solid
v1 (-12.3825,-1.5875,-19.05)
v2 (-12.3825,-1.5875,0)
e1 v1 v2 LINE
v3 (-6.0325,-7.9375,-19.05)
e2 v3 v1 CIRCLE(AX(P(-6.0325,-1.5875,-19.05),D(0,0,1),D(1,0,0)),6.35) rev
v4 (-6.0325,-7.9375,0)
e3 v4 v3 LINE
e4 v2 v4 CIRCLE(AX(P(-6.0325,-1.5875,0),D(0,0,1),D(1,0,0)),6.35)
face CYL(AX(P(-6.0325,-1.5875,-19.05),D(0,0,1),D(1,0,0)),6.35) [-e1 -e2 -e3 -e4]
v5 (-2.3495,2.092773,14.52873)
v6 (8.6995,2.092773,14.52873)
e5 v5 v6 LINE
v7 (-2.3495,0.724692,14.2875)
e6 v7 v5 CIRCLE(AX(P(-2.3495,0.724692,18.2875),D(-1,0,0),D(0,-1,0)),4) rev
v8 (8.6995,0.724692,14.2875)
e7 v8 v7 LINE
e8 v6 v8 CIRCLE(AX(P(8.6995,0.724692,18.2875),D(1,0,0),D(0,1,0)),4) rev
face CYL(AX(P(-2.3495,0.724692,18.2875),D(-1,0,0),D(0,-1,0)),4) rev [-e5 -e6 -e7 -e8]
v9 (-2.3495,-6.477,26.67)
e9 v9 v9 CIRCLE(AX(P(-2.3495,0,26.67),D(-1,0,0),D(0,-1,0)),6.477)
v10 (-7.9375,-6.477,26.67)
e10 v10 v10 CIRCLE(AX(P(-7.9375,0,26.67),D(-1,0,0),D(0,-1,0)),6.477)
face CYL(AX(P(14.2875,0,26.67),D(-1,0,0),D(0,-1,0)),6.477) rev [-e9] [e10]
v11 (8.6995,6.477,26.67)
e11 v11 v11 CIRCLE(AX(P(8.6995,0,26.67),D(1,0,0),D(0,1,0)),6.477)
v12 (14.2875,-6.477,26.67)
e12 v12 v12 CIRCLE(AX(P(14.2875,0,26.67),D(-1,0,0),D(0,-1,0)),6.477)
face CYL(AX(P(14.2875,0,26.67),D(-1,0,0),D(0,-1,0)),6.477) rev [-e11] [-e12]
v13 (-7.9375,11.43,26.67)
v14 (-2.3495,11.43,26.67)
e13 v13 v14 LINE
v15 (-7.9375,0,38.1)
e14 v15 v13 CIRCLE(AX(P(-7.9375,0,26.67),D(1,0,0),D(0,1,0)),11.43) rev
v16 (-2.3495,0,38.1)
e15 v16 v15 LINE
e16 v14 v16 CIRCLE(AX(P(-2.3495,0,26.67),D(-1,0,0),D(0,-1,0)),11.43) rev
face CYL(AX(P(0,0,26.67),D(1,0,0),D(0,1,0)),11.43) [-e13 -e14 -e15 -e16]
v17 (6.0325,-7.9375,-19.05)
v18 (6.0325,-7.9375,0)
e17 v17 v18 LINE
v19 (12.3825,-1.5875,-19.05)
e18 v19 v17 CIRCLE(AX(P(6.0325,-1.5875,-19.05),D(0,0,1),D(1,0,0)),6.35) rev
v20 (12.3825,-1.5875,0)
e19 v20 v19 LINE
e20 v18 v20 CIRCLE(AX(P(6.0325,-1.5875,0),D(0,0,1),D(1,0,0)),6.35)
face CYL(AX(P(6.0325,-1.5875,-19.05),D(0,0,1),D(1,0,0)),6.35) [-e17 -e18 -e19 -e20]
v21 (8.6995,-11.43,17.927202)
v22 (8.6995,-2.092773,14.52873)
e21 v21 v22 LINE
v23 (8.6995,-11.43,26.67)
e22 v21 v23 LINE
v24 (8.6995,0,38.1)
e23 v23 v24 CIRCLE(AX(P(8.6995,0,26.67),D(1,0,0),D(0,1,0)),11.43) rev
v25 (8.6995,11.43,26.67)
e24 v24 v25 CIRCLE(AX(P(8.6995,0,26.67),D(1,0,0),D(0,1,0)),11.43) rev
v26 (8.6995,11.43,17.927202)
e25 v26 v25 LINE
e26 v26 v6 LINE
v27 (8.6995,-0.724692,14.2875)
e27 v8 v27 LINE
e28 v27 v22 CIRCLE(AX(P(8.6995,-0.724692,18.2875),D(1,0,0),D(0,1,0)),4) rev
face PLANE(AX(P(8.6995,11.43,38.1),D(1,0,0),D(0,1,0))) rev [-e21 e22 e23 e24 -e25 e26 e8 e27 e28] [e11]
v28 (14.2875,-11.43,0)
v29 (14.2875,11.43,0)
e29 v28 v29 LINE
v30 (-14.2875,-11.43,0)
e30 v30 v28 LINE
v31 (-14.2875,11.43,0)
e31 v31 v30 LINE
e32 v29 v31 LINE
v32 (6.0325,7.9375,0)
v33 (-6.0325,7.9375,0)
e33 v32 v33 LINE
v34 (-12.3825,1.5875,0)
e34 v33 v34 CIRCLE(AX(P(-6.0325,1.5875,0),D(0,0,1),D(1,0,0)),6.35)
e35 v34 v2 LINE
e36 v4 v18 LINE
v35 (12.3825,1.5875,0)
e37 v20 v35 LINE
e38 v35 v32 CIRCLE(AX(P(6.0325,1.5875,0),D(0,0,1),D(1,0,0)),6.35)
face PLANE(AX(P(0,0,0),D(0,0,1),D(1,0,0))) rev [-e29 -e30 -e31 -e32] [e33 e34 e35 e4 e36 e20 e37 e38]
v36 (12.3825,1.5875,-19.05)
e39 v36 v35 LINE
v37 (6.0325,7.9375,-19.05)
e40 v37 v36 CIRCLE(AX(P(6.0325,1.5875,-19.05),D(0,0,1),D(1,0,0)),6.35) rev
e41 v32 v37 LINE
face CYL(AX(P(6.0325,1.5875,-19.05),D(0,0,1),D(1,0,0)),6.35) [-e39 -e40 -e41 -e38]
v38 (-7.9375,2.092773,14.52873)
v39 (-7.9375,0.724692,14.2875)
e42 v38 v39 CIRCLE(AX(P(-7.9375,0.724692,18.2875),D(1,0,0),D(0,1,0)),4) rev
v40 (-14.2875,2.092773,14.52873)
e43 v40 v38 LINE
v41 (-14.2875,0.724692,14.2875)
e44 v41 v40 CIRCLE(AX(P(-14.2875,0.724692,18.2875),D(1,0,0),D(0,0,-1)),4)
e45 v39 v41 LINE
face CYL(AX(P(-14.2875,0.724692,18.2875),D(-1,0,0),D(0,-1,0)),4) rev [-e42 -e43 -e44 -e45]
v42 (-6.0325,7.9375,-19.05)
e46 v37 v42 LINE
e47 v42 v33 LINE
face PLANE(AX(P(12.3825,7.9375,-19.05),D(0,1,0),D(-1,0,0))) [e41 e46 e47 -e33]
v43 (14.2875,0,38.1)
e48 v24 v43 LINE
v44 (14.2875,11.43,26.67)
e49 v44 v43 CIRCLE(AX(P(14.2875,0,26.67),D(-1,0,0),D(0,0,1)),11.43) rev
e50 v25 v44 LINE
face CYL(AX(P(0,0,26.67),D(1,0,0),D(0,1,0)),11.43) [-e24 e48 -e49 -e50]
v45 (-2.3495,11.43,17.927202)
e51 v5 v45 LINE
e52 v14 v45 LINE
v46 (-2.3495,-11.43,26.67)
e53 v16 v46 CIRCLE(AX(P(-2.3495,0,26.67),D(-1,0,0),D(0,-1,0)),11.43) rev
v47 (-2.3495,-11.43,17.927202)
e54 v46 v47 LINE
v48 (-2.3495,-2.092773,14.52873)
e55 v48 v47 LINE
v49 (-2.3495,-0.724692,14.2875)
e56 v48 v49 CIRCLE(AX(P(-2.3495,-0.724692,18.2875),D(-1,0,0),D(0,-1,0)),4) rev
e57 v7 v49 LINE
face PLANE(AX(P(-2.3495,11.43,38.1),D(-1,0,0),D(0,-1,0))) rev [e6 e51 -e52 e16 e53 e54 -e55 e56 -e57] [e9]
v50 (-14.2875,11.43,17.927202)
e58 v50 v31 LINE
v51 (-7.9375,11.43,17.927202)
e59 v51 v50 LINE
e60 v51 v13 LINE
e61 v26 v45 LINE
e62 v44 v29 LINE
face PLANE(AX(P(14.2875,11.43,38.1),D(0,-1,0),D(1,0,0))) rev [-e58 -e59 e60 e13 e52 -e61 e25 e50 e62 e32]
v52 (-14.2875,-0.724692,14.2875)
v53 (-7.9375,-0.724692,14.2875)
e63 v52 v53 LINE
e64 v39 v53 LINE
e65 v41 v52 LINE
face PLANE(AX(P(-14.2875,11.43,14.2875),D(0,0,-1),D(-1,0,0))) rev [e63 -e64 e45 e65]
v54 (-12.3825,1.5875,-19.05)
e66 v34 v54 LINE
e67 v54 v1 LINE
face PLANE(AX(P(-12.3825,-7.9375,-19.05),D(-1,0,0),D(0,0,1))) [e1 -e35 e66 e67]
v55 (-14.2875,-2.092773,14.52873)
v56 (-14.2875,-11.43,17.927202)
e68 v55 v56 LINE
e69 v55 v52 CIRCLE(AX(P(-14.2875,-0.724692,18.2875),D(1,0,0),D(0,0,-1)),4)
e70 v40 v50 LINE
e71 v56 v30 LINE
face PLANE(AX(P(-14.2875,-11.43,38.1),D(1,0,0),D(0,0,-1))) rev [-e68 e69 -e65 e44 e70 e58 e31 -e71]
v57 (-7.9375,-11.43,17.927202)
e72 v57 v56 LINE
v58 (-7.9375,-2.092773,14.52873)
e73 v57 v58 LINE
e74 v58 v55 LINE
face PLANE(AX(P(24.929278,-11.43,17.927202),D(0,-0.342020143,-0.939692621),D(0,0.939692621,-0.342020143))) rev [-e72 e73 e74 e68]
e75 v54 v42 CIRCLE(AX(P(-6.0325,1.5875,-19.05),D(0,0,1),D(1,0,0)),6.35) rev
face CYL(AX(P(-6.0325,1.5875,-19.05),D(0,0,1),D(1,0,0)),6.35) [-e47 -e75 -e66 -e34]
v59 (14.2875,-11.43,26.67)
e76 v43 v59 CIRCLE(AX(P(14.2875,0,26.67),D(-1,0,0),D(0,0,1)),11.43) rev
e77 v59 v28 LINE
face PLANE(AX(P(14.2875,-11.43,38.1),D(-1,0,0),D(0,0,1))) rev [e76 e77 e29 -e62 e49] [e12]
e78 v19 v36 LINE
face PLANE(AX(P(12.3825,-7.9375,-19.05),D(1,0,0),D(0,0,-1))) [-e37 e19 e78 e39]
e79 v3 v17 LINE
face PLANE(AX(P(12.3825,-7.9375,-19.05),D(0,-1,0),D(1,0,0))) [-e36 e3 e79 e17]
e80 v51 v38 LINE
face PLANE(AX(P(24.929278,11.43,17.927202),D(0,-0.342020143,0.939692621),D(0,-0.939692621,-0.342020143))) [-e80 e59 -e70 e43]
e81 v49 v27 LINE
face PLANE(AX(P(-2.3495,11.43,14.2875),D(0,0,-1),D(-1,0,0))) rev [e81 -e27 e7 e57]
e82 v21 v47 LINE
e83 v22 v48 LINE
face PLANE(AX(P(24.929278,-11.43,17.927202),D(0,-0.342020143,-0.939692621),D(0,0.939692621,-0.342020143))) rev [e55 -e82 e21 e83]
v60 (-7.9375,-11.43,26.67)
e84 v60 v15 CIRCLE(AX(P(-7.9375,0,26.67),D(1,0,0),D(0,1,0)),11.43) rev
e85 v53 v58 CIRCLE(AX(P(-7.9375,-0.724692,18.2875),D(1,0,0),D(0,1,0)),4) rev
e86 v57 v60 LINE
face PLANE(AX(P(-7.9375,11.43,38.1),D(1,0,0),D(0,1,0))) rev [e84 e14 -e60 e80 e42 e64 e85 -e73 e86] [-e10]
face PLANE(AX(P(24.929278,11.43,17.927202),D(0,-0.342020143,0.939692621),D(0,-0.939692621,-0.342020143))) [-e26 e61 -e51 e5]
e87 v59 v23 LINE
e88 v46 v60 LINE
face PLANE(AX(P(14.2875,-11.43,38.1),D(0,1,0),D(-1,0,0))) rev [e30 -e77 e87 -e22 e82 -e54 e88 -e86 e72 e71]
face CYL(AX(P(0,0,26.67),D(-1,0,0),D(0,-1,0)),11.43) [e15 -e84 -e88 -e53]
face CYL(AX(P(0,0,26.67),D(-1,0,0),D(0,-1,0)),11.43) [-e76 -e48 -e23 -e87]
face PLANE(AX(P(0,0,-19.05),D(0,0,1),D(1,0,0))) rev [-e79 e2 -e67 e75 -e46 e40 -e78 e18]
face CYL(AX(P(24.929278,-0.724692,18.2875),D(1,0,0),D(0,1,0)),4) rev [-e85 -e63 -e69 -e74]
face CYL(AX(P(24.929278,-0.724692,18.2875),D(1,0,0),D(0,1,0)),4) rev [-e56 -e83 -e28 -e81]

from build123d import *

# Parameters (mm, degrees)
SKETCH2_W           = 24.765
SKETCH2_H           = 15.875
BOSS_EXTRUDE1_DEPTH = 19.05
SKETCH3_W           = 28.575
SKETCH3_H           = 22.86
BOSS_EXTRUDE2_DEPTH = 38.1
SKETCH4_W           = 6.35
SKETCH4_H           = 23.8125
SKETCH4_W_2         = 11.049
CUT_EXTRUDE1_DEPTH  = 47.6725
FILLET5_R           = 11.43
SKETCH7_R           = 6.477
CUT_EXTRUDE3_DEPTH  = 46.56539833
FILLET3_R           = 6.35
BOSS_EXTRU_1_REACH  = 50.977
CONG_3_R            = 4


with BuildPart() as part:
    # Sketch2 → Boss-Extrude1 (new body)
    with BuildSketch(Plane.XY):
        Rectangle(SKETCH2_W, SKETCH2_H)
    extrude(amount=-BOSS_EXTRUDE1_DEPTH)

    # Sketch3 → Boss-Extrude2 (add)
    with BuildSketch(Plane.XY):
        Rectangle(SKETCH3_W, SKETCH3_H)
    extrude(amount=BOSS_EXTRUDE2_DEPTH)

    # Sketch4 → Cut-Extrude1 (cut, through all)
    with BuildSketch(Plane(origin=(0, -11.43, 0), x_dir=(-1, 0, 0), z_dir=(0, -1, 0))):
        with Locations((11.1125, -26.19375)):
            Rectangle(SKETCH4_W, SKETCH4_H)
        with Locations((-3.175, -26.19375)):
            Rectangle(SKETCH4_W_2, SKETCH4_H)
    extrude(amount=-CUT_EXTRUDE1_DEPTH, mode=Mode.SUBTRACT)

    # Fillet5
    fillet5_edges = [part.edges().sort_by_distance(p)[0] for p in [
        (-5.1435, -11.43, 38.1),
        (-5.1435, 11.43, 38.1),
        (11.4935, 11.43, 38.1),
        (11.4935, -11.43, 38.1),
    ]]
    fillet(fillet5_edges, radius=FILLET5_R - 0.0001)  # a hair under: the kernel refuses the full size

    # Sketch7 → Cut-Extrude3 (cut, through all)
    with BuildSketch(Plane.ZY.offset(7.9375)):
        with Locations(Location((26.67, 0, 0), (0, 0, 270))):
            Circle(SKETCH7_R)
    extrude(amount=-CUT_EXTRUDE3_DEPTH, mode=Mode.SUBTRACT)

    # Fillet3
    fillet3_edges = [part.edges().sort_by_distance(p)[0] for p in [
        (-12.3825, 7.9375, -9.525),
        (12.3825, 7.9375, -9.525),
        (12.3825, -7.9375, -9.525),
        (-12.3825, -7.9375, -9.525),
    ]]
    fillet(fillet3_edges, radius=FILLET3_R)

    # Boss.-Extru.1: up to this face of the body (flat: up to its plane)
    boss_extru_1_end = Plane(part.part.faces().sort_by_distance((14.2875, 0, 16.22567269))[0])
    # Esquisse1 → Boss.-Extru.1 (add, up to the picked face)
    with BuildSketch(Plane.ZY.offset(14.2875), mode=Mode.PRIVATE) as boss_extru_1_sk1:
        Polygon((14.2875, 11.43), (17.927202343, 11.43), (14.2875, 1.43), align=None)
    boss_extru_1_tool1 = split(extrude(boss_extru_1_sk1.sketch, amount=-BOSS_EXTRU_1_REACH, mode=Mode.PRIVATE), bisect_by=boss_extru_1_end, keep=Keep.BOTH, mode=Mode.PRIVATE)
    boss_extru_1 = boss_extru_1_tool1.solids().sort_by(Axis((-14.2875, 8.096667, 15.500734), (1, 0, 0)))[0]
    add(boss_extru_1)

    # Symétrie1: Boss.-Extru.1 across plane
    add(boss_extru_1.mirror(Plane.ZX))

    # Congé3
    cong_3_edges = [part.edges().sort_by_distance(p)[0] for p in [
        (-11.1125, 1.43, 14.2875),
        (3.175, 1.43, 14.2875),
        (-11.1125, -1.43, 14.2875),
        (3.175, -1.43, 14.2875),
    ]]
    fillet(cong_3_edges, radius=CONG_3_R)


solid = part.part
